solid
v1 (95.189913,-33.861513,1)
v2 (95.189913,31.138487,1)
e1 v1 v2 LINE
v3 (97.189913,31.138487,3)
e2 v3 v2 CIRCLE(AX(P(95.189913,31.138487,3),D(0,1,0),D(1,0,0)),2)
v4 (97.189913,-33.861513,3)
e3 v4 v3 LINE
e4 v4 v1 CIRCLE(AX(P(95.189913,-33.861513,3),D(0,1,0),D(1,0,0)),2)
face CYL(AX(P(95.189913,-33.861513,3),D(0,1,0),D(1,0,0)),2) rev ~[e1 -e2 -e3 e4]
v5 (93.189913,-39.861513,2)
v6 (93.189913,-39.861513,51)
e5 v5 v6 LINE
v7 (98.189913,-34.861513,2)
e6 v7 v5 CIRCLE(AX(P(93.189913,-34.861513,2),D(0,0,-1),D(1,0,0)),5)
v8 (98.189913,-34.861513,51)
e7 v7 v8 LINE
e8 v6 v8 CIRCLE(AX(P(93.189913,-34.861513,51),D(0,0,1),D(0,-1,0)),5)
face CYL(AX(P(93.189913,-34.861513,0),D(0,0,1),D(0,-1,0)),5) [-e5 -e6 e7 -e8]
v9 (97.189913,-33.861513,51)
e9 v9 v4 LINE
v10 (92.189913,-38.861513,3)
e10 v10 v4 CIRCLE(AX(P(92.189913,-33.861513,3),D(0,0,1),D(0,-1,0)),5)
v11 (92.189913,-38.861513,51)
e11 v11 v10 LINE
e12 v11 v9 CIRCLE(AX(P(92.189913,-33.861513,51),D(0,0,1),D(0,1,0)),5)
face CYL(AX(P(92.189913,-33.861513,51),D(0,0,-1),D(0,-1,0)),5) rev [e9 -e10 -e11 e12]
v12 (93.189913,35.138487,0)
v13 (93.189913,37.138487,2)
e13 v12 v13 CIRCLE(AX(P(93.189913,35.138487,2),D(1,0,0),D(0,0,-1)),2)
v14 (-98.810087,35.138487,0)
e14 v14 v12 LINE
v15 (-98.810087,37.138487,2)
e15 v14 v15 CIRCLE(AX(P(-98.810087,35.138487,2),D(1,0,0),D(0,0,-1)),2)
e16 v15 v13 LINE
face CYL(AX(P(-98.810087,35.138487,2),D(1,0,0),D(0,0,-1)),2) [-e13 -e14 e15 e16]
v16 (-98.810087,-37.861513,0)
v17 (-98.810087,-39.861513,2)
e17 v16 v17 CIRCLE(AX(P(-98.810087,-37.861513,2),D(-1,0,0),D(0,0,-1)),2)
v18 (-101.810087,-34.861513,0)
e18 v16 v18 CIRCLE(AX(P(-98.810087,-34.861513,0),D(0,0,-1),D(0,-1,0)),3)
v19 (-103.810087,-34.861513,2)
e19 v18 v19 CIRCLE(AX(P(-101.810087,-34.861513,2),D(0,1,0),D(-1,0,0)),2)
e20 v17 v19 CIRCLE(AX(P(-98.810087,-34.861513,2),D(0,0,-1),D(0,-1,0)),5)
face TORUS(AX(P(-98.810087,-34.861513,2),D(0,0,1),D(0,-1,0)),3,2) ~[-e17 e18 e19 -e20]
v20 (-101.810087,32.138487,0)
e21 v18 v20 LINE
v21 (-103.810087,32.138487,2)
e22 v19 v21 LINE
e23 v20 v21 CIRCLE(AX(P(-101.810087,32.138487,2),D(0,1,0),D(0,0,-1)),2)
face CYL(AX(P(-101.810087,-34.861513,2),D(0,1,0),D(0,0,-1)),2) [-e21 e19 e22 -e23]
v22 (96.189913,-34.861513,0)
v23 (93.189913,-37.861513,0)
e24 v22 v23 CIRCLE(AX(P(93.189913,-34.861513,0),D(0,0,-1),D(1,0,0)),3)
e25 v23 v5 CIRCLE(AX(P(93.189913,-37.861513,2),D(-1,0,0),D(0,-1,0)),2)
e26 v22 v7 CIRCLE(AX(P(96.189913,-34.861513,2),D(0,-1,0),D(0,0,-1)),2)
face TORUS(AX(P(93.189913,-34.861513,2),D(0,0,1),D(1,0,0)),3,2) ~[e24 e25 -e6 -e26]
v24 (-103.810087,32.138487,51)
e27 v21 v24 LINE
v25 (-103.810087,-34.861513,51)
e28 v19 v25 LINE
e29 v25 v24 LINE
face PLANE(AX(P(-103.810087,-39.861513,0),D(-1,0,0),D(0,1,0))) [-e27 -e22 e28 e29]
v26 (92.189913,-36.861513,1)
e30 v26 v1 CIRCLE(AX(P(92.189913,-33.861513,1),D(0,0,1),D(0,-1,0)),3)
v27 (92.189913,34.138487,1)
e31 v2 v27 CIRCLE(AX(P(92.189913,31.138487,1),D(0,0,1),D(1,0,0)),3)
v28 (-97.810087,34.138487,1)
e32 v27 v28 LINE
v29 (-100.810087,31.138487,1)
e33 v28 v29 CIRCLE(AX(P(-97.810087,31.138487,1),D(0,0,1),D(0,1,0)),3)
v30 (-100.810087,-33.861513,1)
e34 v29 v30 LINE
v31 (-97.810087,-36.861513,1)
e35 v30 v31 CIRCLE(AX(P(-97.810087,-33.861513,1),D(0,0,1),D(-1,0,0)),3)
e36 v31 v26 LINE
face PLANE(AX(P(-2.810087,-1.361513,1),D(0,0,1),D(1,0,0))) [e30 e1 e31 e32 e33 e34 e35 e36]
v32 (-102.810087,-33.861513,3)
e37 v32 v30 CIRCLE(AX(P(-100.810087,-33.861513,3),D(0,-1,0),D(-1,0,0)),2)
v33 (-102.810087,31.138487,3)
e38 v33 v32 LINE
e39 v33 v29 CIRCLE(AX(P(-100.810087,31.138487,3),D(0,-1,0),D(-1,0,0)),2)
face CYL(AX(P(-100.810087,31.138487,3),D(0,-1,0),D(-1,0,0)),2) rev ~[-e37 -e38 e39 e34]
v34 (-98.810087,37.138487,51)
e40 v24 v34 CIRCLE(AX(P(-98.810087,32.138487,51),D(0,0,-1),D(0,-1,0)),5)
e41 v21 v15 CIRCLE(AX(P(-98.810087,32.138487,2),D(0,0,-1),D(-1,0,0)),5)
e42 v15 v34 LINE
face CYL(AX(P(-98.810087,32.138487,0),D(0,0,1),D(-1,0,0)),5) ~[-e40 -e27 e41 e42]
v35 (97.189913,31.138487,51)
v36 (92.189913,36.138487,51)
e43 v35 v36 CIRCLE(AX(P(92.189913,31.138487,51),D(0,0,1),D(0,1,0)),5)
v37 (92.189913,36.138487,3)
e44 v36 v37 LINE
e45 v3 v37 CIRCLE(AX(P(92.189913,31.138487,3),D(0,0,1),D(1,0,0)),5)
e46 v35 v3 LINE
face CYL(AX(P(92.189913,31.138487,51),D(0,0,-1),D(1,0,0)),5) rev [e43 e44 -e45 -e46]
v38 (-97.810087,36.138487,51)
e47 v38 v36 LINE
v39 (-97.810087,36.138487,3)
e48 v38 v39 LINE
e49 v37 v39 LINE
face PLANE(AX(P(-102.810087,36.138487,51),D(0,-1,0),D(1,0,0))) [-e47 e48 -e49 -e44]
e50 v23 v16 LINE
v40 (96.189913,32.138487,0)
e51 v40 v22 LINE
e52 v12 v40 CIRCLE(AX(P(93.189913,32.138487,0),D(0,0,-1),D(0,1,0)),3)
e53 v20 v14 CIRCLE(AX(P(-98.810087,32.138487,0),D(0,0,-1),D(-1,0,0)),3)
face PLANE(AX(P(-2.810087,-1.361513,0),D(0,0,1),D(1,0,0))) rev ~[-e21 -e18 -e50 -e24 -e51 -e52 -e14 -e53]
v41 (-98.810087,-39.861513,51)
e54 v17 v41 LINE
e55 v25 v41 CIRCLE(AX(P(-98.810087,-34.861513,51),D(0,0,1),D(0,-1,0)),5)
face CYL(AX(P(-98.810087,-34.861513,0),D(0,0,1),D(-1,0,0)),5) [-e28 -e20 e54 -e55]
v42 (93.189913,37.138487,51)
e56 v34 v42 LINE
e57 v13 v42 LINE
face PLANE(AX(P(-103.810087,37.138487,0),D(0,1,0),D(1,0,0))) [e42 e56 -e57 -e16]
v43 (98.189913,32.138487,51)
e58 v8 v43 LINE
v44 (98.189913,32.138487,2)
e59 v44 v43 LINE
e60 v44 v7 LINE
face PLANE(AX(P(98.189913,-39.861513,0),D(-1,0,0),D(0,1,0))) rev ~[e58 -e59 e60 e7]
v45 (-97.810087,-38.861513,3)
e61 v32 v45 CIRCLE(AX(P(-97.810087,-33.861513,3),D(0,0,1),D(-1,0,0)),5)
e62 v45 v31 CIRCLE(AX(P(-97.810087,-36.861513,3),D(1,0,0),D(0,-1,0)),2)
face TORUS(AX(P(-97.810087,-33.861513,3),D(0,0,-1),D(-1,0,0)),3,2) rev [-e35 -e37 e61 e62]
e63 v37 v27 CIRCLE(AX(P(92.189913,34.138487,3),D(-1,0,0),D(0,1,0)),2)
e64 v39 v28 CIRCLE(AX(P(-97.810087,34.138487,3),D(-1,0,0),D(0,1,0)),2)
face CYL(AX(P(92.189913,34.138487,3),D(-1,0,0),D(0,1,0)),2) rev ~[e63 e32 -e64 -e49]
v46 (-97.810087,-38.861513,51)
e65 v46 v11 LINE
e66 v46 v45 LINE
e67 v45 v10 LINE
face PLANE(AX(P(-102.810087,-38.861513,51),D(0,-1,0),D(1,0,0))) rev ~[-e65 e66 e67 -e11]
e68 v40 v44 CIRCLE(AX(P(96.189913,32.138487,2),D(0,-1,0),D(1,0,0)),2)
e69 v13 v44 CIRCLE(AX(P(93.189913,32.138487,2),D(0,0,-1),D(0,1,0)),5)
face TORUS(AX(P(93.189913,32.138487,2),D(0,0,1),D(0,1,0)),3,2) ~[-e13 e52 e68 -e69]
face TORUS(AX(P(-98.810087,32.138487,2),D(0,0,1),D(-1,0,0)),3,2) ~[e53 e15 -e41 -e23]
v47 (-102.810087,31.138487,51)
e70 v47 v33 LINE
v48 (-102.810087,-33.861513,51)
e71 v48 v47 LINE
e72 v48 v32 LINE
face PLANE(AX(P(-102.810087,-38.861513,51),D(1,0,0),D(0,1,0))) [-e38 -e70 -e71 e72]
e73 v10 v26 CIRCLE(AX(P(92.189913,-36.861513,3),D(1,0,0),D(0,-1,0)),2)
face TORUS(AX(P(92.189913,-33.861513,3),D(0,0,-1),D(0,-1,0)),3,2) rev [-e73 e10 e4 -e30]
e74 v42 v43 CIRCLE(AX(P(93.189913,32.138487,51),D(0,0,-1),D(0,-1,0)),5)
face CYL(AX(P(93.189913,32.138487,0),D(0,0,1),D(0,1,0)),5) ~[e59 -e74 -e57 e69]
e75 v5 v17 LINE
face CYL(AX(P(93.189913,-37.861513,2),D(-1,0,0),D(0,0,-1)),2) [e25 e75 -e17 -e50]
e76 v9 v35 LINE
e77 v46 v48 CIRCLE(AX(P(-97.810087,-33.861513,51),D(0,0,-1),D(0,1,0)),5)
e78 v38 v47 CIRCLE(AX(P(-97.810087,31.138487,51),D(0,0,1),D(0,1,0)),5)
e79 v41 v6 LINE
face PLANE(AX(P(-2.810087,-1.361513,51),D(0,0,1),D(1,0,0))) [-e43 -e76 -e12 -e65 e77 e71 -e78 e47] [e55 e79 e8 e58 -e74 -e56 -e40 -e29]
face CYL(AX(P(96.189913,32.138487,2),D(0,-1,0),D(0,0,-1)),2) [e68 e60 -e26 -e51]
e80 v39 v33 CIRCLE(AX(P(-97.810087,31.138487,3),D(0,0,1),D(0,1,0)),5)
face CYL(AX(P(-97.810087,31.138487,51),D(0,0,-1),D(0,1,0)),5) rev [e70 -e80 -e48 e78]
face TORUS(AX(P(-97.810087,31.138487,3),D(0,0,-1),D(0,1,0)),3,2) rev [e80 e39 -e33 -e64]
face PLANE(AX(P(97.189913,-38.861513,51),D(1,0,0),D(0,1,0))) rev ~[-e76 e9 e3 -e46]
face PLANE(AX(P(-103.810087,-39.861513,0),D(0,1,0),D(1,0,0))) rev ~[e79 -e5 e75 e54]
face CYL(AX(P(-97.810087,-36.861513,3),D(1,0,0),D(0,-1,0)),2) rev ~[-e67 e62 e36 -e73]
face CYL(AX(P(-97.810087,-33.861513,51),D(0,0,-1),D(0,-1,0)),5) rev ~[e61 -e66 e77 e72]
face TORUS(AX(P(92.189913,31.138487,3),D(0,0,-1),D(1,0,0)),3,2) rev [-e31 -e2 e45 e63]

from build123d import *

# Parameters (mm, degrees)
F0_W     = 202
F0_H     = 77
F1_DEPTH = 51
F2_W     = 200
F2_H     = 75
F3_DEPTH = 50
F4_R     = 5
F5_R     = 2


# Not quite as in the source:
# - a feature of the source that left no trace in its solid (it failed there, or was rolled back) is left out


with BuildPart() as f1:
    # F0 (on Top) → F1 (new body)
    with BuildSketch(Plane.XY):
        with Locations((-2.8100872189, -1.361513185)):
            Rectangle(F0_W, F0_H)
    extrude(amount=F1_DEPTH)

    # F2 (on face) → F3 (cut)
    with BuildSketch(Plane.XY.offset(51)):
        with Locations((-2.8100872189, -1.361513185)):
            Rectangle(F2_W, F2_H)
    extrude(amount=-F3_DEPTH, mode=Mode.SUBTRACT)

    # F4
    f4_edges = [f1.edges().sort_by_distance(p)[0] for p in [
        (97.189913, 36.138487, 26),
        (-102.810087, 36.138487, 26),
        (97.189913, -38.861513, 26),
        (-102.810087, -38.861513, 26),
        (98.189913, 37.138487, 25.5),
        (-103.810087, 37.138487, 25.5),
        (98.189913, -39.861513, 25.5),
        (-103.810087, -39.861513, 25.5),
    ]]
    fillet(f4_edges, radius=F4_R)

    # F5
    f5_edges = [f1.edges().sort_by_distance(p)[0] for p in [
        (97.189913, -1.361513, 1),
        (-2.810087, 36.138487, 1),
        (-2.810087, -38.861513, 1),
        (-2.810087, 37.138487, 0),
        (96.725447, 35.674021, 0),
        (-102.345621, 35.674021, 0),
        (98.189913, -1.361513, 0),
        (-103.810087, -1.361513, 0),
        (96.725447, -38.397047, 0),
        (-102.345621, -38.397047, 0),
        (-2.810087, -39.861513, 0),
        (95.725447, -37.397047, 1),
        (95.725447, 34.674021, 1),
        (-101.345621, -37.397047, 1),
        (-101.345621, 34.674021, 1),
        (-102.810087, -1.361513, 1),
    ]]
    fillet(f5_edges, radius=F5_R)


solid = f1.part
